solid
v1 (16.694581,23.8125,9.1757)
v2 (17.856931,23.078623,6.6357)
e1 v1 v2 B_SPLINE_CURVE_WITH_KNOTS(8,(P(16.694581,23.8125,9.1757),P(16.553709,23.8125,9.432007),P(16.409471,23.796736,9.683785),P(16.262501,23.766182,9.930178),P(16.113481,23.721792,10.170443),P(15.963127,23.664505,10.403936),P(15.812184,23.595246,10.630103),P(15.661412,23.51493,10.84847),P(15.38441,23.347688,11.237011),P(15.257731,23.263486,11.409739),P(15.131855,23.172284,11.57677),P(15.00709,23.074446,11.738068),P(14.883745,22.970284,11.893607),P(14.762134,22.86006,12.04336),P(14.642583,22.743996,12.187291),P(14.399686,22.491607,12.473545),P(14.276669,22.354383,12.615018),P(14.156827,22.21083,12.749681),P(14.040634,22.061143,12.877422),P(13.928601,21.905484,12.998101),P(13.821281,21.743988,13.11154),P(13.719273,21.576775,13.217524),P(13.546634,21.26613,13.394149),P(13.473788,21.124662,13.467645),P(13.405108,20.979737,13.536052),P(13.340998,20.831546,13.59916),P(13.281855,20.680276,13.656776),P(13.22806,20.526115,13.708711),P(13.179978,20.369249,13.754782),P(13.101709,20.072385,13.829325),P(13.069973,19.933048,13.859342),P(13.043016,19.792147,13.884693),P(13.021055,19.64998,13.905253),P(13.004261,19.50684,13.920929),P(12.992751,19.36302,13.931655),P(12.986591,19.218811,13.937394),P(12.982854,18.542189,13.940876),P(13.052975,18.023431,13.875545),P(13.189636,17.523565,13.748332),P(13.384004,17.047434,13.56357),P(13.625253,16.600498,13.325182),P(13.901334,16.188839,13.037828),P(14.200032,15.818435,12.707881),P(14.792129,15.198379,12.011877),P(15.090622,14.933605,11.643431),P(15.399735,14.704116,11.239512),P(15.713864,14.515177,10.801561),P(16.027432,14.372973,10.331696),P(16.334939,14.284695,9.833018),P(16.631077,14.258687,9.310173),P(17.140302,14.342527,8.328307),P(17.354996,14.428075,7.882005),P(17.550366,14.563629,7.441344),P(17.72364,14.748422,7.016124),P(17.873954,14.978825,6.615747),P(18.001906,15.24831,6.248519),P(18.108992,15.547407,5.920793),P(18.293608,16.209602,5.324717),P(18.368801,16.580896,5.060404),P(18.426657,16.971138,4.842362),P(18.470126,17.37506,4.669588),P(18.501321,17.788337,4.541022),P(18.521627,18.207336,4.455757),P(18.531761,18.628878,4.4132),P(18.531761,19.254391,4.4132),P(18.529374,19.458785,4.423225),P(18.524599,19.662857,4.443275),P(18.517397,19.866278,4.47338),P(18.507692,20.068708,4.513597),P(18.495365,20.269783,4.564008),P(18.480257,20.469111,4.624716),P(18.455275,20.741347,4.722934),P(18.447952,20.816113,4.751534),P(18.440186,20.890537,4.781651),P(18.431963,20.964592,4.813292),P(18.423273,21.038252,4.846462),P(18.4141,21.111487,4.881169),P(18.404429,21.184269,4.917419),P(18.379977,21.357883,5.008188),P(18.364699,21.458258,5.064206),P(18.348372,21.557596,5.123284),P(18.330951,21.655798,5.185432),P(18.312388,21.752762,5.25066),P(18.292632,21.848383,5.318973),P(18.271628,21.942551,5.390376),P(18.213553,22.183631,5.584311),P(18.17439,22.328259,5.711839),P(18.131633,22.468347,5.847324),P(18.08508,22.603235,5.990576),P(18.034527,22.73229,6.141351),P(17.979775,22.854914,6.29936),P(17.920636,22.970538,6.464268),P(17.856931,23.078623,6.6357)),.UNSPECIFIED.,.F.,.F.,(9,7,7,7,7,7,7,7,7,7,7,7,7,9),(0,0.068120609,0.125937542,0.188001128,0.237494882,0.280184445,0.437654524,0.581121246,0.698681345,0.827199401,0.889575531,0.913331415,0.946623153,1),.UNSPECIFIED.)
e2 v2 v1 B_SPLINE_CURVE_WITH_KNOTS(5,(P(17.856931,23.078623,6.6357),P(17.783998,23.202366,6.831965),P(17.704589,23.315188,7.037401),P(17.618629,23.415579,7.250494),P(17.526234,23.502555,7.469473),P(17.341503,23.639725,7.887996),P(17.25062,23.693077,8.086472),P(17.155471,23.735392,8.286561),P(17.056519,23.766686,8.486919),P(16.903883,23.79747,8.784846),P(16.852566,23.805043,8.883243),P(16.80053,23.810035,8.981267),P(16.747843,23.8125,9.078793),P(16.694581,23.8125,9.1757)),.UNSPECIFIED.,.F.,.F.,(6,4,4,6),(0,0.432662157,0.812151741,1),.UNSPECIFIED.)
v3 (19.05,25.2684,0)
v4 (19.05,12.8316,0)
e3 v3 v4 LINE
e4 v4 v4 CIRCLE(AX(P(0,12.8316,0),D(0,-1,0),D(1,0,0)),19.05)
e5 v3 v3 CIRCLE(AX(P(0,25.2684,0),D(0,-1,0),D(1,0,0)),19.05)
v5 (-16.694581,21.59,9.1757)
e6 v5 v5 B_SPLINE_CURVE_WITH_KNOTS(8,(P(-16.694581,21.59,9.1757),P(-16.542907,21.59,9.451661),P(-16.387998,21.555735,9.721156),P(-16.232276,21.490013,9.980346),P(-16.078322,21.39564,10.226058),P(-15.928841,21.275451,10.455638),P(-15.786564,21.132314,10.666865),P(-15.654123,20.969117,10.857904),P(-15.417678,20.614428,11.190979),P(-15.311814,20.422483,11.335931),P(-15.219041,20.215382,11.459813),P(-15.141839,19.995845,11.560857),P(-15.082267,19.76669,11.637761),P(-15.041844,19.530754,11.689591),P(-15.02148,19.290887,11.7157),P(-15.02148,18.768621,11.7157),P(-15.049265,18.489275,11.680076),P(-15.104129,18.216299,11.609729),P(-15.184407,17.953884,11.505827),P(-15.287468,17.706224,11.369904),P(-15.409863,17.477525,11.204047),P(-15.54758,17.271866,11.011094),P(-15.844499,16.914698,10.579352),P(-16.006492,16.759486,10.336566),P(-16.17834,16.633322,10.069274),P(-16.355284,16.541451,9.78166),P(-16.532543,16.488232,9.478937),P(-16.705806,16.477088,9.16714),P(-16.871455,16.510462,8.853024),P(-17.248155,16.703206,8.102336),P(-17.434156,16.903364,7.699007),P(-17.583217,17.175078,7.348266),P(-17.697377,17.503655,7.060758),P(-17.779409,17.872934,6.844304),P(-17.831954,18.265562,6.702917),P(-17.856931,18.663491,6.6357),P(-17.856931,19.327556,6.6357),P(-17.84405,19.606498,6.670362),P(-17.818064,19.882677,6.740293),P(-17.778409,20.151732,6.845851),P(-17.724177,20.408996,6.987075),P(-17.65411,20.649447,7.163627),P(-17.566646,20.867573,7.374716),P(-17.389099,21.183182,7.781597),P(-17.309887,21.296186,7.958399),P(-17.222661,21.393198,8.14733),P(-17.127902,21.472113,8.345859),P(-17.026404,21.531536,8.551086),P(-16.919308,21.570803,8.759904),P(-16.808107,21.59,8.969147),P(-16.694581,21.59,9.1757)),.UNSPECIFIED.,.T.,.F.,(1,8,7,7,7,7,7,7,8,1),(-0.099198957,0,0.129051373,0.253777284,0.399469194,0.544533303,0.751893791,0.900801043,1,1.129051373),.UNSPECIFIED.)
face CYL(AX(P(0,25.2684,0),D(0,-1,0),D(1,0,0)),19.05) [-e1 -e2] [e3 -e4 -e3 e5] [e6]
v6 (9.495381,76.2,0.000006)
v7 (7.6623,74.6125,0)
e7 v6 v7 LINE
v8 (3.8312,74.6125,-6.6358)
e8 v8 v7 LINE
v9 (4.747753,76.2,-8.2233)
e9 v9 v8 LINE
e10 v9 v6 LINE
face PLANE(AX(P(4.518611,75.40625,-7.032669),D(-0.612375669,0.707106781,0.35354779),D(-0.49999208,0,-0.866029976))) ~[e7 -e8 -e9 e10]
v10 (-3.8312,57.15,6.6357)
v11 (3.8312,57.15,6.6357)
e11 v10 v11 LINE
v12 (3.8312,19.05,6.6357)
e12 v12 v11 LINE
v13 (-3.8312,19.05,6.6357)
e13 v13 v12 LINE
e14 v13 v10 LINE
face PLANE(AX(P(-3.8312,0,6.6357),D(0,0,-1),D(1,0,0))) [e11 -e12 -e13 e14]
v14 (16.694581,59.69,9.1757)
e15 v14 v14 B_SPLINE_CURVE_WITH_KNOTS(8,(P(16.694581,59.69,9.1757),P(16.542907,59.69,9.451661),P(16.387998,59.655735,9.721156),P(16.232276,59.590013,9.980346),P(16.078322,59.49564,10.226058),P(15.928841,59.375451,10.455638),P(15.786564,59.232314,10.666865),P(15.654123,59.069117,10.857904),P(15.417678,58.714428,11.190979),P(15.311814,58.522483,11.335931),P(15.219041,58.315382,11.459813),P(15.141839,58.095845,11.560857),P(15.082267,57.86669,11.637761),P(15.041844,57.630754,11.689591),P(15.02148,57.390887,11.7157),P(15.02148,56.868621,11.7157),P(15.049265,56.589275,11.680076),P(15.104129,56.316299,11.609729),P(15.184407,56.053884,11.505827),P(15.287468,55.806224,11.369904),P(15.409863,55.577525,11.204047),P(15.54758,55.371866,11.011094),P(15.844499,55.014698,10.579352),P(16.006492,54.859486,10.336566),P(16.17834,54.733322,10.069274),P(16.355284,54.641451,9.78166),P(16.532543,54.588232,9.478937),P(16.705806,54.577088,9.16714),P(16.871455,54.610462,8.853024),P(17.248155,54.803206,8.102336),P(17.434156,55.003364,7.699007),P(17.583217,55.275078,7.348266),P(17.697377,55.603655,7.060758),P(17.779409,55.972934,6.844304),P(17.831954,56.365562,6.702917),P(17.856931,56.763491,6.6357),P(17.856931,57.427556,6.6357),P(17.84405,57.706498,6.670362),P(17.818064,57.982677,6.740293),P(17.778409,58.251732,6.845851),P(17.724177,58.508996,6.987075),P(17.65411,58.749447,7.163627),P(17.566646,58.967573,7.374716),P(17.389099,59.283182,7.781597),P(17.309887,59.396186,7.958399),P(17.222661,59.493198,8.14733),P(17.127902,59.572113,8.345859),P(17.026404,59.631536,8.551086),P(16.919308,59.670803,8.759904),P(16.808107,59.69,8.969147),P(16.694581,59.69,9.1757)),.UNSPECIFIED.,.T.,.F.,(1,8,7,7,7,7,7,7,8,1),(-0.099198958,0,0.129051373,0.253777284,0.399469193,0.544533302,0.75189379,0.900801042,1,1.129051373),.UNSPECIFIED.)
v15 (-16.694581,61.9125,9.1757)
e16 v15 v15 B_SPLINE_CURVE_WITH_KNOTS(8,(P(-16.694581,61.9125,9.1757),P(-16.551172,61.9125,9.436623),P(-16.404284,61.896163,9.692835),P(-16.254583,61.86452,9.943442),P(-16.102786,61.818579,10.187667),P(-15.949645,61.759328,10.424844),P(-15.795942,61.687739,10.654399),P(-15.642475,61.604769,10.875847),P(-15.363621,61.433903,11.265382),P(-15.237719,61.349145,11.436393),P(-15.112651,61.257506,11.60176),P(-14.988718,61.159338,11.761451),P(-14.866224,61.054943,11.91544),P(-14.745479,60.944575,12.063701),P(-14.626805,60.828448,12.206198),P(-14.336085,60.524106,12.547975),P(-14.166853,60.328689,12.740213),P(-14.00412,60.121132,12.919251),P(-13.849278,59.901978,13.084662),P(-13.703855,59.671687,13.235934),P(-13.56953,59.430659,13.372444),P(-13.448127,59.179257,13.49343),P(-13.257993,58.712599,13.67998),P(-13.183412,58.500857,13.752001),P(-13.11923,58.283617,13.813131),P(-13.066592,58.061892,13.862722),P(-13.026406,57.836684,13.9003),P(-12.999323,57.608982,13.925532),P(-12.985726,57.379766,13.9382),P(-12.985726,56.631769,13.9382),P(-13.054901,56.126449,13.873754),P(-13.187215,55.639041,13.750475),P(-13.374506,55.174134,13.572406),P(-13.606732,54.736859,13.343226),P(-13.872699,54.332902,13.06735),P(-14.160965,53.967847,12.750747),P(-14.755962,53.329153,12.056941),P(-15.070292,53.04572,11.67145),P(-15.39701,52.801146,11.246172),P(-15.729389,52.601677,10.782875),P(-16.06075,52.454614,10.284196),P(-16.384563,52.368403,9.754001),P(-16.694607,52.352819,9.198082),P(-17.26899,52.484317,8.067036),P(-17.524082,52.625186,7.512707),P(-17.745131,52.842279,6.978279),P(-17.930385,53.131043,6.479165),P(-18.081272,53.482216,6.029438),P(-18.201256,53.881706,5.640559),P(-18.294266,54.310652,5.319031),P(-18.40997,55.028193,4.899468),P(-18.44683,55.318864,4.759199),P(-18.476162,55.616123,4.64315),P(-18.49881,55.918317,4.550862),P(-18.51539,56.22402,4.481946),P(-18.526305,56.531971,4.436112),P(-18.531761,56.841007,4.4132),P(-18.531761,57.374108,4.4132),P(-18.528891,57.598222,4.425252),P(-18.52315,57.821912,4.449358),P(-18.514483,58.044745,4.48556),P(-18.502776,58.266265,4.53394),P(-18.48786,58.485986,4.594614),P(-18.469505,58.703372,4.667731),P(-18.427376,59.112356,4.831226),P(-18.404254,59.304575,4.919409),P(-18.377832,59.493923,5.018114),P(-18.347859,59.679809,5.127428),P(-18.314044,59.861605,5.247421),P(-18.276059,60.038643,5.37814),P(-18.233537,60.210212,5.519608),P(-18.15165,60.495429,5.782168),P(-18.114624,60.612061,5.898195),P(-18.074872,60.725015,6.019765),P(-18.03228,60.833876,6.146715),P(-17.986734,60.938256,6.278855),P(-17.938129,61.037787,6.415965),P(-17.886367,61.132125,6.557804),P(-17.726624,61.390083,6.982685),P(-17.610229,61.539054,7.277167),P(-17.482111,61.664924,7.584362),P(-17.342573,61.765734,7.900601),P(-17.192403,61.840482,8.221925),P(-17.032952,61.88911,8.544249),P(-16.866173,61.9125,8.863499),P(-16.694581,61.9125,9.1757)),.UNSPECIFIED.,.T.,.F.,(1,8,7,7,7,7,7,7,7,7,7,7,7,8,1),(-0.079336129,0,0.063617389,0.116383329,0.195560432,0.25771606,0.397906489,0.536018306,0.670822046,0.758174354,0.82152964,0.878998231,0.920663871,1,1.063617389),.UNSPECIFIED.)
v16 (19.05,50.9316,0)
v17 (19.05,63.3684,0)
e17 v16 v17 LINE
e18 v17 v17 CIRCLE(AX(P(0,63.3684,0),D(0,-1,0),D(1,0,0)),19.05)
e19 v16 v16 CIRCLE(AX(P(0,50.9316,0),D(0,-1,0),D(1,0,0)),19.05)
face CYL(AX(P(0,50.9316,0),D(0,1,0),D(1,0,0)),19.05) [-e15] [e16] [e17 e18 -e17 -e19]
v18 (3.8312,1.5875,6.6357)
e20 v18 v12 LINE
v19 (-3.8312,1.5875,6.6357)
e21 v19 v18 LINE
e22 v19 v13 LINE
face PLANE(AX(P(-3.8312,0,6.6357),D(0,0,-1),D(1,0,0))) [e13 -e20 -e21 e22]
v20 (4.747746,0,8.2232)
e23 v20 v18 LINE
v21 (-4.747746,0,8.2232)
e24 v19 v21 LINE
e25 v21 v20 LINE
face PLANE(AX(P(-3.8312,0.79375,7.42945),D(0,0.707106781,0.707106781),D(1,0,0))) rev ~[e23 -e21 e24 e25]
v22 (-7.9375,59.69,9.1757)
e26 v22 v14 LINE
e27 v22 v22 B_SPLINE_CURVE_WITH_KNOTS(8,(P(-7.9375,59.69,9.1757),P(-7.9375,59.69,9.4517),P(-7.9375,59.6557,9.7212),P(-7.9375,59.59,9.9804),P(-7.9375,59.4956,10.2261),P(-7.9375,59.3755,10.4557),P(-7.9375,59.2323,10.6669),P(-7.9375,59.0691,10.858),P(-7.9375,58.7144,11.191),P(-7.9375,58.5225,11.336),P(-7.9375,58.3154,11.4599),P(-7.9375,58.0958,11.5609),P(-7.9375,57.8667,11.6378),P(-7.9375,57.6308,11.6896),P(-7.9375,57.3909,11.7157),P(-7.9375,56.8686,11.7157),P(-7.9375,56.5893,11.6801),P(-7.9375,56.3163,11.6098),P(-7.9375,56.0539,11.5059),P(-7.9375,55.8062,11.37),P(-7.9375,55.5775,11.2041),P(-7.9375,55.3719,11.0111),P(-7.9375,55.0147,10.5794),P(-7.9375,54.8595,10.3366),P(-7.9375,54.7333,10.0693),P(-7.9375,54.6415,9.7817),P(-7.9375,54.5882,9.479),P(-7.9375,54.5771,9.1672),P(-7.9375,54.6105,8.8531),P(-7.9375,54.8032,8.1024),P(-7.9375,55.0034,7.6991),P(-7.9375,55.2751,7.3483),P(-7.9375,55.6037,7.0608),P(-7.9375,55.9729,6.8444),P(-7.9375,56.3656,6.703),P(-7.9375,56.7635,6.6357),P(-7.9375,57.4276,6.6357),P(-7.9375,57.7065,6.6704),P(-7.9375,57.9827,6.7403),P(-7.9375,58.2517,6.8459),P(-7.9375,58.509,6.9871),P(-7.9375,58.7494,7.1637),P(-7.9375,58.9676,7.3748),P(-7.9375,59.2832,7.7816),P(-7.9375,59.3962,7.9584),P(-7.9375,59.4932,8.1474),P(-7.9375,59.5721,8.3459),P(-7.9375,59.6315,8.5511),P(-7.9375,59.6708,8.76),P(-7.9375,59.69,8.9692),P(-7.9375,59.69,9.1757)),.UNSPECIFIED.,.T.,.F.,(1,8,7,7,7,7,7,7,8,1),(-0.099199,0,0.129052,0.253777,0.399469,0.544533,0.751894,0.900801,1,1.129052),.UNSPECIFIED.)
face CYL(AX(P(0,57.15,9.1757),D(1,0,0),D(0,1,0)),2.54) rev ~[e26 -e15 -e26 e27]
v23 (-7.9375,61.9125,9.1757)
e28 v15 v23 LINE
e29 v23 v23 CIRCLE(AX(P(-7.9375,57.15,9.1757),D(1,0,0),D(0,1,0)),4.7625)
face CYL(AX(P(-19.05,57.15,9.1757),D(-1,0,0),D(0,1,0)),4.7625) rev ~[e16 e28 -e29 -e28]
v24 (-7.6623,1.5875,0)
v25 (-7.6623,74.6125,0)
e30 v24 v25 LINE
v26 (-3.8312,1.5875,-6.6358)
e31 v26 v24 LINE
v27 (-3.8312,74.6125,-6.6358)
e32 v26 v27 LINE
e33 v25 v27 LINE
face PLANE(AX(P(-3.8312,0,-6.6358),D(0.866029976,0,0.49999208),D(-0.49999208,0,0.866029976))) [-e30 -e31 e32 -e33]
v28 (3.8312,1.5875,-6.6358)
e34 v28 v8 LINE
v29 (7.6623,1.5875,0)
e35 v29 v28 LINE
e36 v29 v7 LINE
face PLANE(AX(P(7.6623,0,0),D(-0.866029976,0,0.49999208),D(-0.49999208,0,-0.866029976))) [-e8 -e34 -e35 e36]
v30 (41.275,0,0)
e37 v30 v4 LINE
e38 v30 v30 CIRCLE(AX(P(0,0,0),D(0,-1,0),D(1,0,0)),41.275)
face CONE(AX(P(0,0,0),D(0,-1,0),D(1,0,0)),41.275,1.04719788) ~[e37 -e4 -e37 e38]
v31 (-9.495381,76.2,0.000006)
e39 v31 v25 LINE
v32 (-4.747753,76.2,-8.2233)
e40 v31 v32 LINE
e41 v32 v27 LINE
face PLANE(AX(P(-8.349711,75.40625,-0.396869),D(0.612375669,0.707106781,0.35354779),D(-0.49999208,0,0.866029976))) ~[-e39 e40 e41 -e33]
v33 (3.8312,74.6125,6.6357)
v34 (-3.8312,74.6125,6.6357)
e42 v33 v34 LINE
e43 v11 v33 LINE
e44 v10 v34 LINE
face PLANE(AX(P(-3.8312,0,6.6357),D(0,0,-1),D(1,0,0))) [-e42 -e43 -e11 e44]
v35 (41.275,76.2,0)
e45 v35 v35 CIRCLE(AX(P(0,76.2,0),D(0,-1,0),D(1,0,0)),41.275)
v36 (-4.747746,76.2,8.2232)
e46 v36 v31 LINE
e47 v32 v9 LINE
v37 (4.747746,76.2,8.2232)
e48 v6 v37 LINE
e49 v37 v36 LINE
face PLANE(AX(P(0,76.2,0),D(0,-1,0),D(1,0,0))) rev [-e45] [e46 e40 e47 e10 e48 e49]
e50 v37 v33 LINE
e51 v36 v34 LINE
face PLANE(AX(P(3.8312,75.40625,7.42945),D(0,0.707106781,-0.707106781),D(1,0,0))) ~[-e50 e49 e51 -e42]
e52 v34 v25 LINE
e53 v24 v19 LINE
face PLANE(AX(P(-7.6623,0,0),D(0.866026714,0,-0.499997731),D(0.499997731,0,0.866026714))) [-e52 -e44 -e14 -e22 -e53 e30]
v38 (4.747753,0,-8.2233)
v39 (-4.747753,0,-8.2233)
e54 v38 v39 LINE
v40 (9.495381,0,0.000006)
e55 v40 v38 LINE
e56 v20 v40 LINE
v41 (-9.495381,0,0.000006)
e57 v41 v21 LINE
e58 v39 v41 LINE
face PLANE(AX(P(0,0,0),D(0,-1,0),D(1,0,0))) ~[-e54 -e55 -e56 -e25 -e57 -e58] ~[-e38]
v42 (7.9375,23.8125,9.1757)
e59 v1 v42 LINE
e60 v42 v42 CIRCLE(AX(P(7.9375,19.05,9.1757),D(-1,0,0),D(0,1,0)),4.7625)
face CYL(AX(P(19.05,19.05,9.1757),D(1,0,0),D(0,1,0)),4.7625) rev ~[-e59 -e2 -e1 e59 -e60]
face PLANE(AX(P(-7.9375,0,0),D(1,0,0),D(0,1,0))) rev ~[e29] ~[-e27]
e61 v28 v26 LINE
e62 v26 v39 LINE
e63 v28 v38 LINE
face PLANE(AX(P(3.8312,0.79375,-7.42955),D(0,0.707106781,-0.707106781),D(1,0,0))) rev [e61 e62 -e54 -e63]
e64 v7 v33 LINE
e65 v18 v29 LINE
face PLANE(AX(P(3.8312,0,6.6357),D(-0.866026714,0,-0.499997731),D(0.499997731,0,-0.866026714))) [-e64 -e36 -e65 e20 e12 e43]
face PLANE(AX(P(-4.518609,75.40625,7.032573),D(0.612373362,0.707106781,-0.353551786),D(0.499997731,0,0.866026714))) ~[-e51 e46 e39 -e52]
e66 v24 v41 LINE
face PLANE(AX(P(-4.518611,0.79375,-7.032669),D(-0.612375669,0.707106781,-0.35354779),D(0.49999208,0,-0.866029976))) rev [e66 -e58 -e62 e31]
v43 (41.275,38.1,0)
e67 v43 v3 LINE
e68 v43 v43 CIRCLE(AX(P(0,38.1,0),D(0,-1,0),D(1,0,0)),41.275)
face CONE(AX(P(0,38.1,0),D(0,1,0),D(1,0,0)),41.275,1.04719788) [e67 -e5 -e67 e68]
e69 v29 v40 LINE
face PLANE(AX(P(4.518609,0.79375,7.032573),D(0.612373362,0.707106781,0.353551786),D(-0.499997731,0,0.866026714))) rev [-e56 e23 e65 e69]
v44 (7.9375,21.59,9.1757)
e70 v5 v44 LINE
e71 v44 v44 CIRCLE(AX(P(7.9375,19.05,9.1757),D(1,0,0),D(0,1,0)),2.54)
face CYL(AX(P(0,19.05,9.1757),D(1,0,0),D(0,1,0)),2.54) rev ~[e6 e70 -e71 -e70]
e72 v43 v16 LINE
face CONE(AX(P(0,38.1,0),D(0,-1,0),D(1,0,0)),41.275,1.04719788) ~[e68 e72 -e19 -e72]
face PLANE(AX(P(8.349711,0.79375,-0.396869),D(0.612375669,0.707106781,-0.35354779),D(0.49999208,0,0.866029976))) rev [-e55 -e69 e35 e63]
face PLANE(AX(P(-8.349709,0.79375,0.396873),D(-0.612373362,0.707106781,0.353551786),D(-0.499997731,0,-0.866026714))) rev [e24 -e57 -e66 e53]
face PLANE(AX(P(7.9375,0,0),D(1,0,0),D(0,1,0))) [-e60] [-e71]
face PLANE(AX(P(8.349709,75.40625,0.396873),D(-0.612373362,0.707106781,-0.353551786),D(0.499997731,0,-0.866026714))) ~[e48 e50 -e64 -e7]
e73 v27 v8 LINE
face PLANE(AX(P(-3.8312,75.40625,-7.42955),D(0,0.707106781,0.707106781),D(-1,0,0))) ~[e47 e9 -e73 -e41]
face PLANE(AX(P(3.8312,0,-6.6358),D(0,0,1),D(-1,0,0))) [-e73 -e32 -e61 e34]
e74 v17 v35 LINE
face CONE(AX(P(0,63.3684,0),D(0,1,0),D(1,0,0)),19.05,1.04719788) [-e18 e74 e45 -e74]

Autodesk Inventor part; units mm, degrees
ref_plane "XZ Plane" through (0, 0, 0) normal (0, 1, 0) x (-1, 0, 0)
sketch "Sketch15" plane through (0, 0, 0) normal (0, 0, 1) x (1, 0, 0)
  line L0 (41.275, 0) -> (41.275, 76.2) construction
  line L1 (0, 0) -> (41.275, 0)
  line L2 (0, 76.2) -> (41.275, 76.2)
  line L3 (19.05, 0) -> (19.05, 76.2) construction
  line L4 (0, 76.2) -> (0, 0)
  line L5 (19.05, 19.05) -> (41.275, 19.05) construction
  line L6 (41.275, 0) -> (19.05, 12.8316)
  line L7 (41.275, 38.1) -> (19.05, 25.2684)
  line L8 (19.05, 25.2684) -> (41.275, 25.2684) construction
  line L9 (19.05, 25.2684) -> (19.05, 12.8316)
  line L10 (41.275, 38.1) -> (19.05, 50.9316)
  line L11 (19.05, 50.9316) -> (19.05, 63.3684)
  line L12 (19.05, 63.3684) -> (41.275, 76.2)
  line L13 (41.275, 38.1) -> (19.05, 38.1) construction
  line L14 (19.05, 63.3684) -> (41.275, 63.3684) construction
  dimension "d85" = 41.275
  dimension "d86" = 76.2
  dimension "d87" = 19.05
  dimension "d88" = 41.275
  dimension "d89" = 38.1
  dimension "centerLineForSpool" = 19.05
  dimension "d93" = 30
  dimension "d94" = 30
  dimension "d95" = 30
  dimension "d96" = 30
revolve "Revolution2" add sketch "Sketch15" angle 360 about axis through (0, 76.2, 0) along (0, -1, 0)
sketch "Sketch16" plane through (0, 0, 0) normal (0, -1, 0) x (1, 0, 0)
  line L0 (-7.6623, 0) -> (-3.8312, 6.6357)
  line L1 (-3.8312, 6.6357) -> (3.8312, 6.6357)
  line L2 (3.8312, 6.6357) -> (7.6623, 0)
  line L3 (7.6623, 0) -> (3.8312, -6.6358)
  line L4 (3.8312, -6.6358) -> (-3.8312, -6.6358)
  line L5 (-3.8312, -6.6358) -> (-7.6623, 0)
  point P0 (0, 0)
  point P1 (0, 0)
  dimension "d103" = 13.2715
extrude "Extrusion11" cut sketch "Sketch16" against normal through all
sketch "Sketch17" plane through (0, 0, 0) normal (1, 0, 0) x (0, 1, 0)
  circle A0 centre (57.15, 9.1757) radius 2.54
  circle A1 centre (19.05, 9.1757) radius 2.54
  line L0 (0, 41.275) -> (0, -41.275) projected
  line L1 (76.2, 41.275) -> (76.2, -41.275) projected
  line L2 (0, 6.6357) -> (76.2, 6.6357) projected
  point P0 (0, 0)
  dimension "d110" = 19.05
  dimension "d111" = 19.05
  dimension "d112" = 5.08
extrude "Extrusion13" cut sketch "Sketch17" along normal through all both and the other way through all
ref_plane "Work Plane4" through (-19.05, 0, 0) normal (1, 0, 0) x (0, 1, 0)
sketch "Sketch22" plane through (-19.05, 0, 0) normal (1, 0, 0) x (0, 1, 0)
  spline S0 degree 8 poles (59.69, 9.1757) (59.69, 9.4517) (59.6557, 9.7212) (59.59, 9.9804) (59.4956, 10.2261) (59.3755, 10.4557) (59.2323, 10.6669) (59.0691, 10.858) (58.7144, 11.191) (58.5225, 11.336) (58.3154, 11.4599) (58.0958, 11.5609) (57.8667, 11.6378) (57.6308, 11.6896) (57.3909, 11.7157) (56.8686, 11.7157) (56.5893, 11.6801) (56.3163, 11.6098) (56.0539, 11.5059) (55.8062, 11.37) (55.5775, 11.2041) (55.3719, 11.0111) (55.0147, 10.5794) (54.8595, 10.3366) (54.7333, 10.0693) (54.6415, 9.7817) (54.5882, 9.479) (54.5771, 9.1672) (54.6105, 8.8531) (54.8032, 8.1024) (55.0034, 7.6991) (55.2751, 7.3483) (55.6037, 7.0608) (55.9729, 6.8444) (56.3656, 6.703) (56.7635, 6.6357) (57.4276, 6.6357) (57.7065, 6.6704) (57.9827, 6.7403) (58.2517, 6.8459) (58.509, 6.9871) (58.7494, 7.1637) (58.9676, 7.3748) (59.2832, 7.7816) (59.3962, 7.9584) (59.4932, 8.1474) (59.5721, 8.3459) (59.6315, 8.5511) (59.6708, 8.76) (59.69, 8.9692) (59.69, 9.1757) knots 0 0 0 0 0 0 0 0 0 0.129052 0.129052 0.129052 0.129052 0.129052 0.129052 0.129052 0.253777 0.253777 0.253777 0.253777 0.253777 0.253777 0.253777 0.399469 0.399469 0.399469 0.399469 0.399469 0.399469 0.399469 0.544533 0.544533 0.544533 0.544533 0.544533 0.544533 0.544533 0.751894 0.751894 0.751894 0.751894 0.751894 0.751894 0.751894 0.900801 0.900801 0.900801 0.900801 0.900801 0.900801 0.900801 1 1 1 1 1 1 1 1 1 projected
  circle A0 centre (57.15, 9.1757) radius 4.7625
  circle A1 centre (57.15, 9.1757) radius 2.54 construction
  line L0 (57.15, 6.6357) -> (76.2, 6.6357) construction
  line L1 (76.2, 41.275) -> (76.2, -41.275) construction
  point P0 (0, 0)
  dimension "d121" = 19.05
  dimension "d122" = 5.08
  dimension "d125" = 9.525
extrude "Extrusion16" cut sketch "Sketch22" along normal blind 11.1125
ref_plane "Work Plane5" through (19.05, 0, 0) normal (1, 0, 0) x (0, 1, 0)
sketch "Sketch23" plane through (19.05, 0, 0) normal (1, 0, 0) x (0, 1, 0)
  line L0 (19.05, 6.6357) -> (57.15, 6.6357) projected
  circle A0 centre (19.05, 9.1757) radius 2.54 construction
  line L1 (0, 41.275) -> (0, -41.275) projected
  circle A1 centre (19.05, 9.1757) radius 4.7625
  point P0 (0, 0)
  dimension "d127" = 5.08
  dimension "d128" = 19.05
  dimension "d129" = 9.525
extrude "Extrusion17" cut sketch "Sketch23" against normal blind 11.1125
chamfer "Chamfer10" distance 1.5875 angle 45 12 edges at (0, 76.2, -6.6358) (5.7467, 76.2, -3.3179) (5.7467, 76.2, 3.3179) (0, 76.2, 6.6357) (-5.7467, 76.2, 3.3179) (-5.7467, 76.2, -3.3179) (-5.7467, 0, -3.3179) (-5.7467, 0, 3.3179) (0, 0, 6.6357) (5.7467, 0, 3.3179) (5.7467, 0, -3.3179) (0, 0, -6.6358)
equation "\"d85\" = spoolExteriorRadius"
equation "\"d86\" = spoolOverallHeight"
equation "\"d88\" = d85"
equation "\"d89\" = 0.5 * spoolOverallHeight"
equation "\"centerLineForSpool\" = 0.25 * spoolOverallHeight"
equation "\"d103\" = hexDiameter"
equation "\"d110\" = centerLineForSpool"
equation "\"d111\" = centerLineForSpool"
equation "\"d112\" = holeForString"
equation "\"d121\" = centerLineForSpool"
equation "\"d122\" = holeForString"
equation "\"d125\" = knotHoleDiameter"
equation "\"d127\" = holeForString"
equation "\"d128\" = centerLineForSpool"
equation "\"d129\" = knotHoleDiameter"
equation "\"d130\" = knotHoleDepth"
equation "\"d132\" = hexHoleChamfer"
equation "\"holeForString\" = stringDiameter + clearanceForString"
equation "\"stringDiameter\" = 3.048"
equation "\"clearanceForString\" = 2.032"
equation "\"spoolHeightWithoutSpacer\" = 69.85"
equation "\"hexShaftDiameter\" = 12.7"
equation "\"clearanceForHexShaft\" = 0.5715"
equation "\"hexDiameter\" = hexShaftDiameter + clearanceForHexShaft"
equation "\"supportChannels\" = 3.81"
equation "\"spoolInteriorDiameter\" = 38.1"
equation "\"spoolInteriroRadius\" = 0.5 * spoolInteriorDiameter"
equation "\"spoolExteriorDiameter\" = 82.55"
equation "\"spoolExteriorRadius\" = 0.5 * spoolExteriorDiameter"
equation "\"spoolFiletRadius\" = 0.5 * supportChannels"
equation "\"holeCenter\" = 0.25 * spoolHeightWithoutSpacer - 0.75 * supportChannels"
equation "\"hexHoleChamfer\" = 1.5875"
equation "\"stringHoleCenterFromHexShaft\" = 0.5 * hexDiameter + 0.5 * holeForString"
equation "\"textCircleDiameter\" = 0.75 * spoolExteriorDiameter"
equation "\"textHeight\" = 6.096"
equation "\"textDepth\" = 1.27"
equation "\"stringHoleChamfer\" = 4.7625"
equation "\"spoolTotalHeight\" = 76.2"
equation "\"spaceHeight\" = spoolTotalHeight - spoolHeightWithoutSpacer"
equation "\"spacerDiameter\" = 24.13"
equation "\"spoolOverallHeight\" = 76.2"
equation "\"d114\" = -spoolInteriroRadius"
equation "\"knotHoleDiameter\" = 9.525"
equation "\"d126\" = spoolInteriroRadius"
equation "\"knotHoleDepth\" = 11.1125"
properties part number "spoolV06" material "PC/ABS Plastic"
